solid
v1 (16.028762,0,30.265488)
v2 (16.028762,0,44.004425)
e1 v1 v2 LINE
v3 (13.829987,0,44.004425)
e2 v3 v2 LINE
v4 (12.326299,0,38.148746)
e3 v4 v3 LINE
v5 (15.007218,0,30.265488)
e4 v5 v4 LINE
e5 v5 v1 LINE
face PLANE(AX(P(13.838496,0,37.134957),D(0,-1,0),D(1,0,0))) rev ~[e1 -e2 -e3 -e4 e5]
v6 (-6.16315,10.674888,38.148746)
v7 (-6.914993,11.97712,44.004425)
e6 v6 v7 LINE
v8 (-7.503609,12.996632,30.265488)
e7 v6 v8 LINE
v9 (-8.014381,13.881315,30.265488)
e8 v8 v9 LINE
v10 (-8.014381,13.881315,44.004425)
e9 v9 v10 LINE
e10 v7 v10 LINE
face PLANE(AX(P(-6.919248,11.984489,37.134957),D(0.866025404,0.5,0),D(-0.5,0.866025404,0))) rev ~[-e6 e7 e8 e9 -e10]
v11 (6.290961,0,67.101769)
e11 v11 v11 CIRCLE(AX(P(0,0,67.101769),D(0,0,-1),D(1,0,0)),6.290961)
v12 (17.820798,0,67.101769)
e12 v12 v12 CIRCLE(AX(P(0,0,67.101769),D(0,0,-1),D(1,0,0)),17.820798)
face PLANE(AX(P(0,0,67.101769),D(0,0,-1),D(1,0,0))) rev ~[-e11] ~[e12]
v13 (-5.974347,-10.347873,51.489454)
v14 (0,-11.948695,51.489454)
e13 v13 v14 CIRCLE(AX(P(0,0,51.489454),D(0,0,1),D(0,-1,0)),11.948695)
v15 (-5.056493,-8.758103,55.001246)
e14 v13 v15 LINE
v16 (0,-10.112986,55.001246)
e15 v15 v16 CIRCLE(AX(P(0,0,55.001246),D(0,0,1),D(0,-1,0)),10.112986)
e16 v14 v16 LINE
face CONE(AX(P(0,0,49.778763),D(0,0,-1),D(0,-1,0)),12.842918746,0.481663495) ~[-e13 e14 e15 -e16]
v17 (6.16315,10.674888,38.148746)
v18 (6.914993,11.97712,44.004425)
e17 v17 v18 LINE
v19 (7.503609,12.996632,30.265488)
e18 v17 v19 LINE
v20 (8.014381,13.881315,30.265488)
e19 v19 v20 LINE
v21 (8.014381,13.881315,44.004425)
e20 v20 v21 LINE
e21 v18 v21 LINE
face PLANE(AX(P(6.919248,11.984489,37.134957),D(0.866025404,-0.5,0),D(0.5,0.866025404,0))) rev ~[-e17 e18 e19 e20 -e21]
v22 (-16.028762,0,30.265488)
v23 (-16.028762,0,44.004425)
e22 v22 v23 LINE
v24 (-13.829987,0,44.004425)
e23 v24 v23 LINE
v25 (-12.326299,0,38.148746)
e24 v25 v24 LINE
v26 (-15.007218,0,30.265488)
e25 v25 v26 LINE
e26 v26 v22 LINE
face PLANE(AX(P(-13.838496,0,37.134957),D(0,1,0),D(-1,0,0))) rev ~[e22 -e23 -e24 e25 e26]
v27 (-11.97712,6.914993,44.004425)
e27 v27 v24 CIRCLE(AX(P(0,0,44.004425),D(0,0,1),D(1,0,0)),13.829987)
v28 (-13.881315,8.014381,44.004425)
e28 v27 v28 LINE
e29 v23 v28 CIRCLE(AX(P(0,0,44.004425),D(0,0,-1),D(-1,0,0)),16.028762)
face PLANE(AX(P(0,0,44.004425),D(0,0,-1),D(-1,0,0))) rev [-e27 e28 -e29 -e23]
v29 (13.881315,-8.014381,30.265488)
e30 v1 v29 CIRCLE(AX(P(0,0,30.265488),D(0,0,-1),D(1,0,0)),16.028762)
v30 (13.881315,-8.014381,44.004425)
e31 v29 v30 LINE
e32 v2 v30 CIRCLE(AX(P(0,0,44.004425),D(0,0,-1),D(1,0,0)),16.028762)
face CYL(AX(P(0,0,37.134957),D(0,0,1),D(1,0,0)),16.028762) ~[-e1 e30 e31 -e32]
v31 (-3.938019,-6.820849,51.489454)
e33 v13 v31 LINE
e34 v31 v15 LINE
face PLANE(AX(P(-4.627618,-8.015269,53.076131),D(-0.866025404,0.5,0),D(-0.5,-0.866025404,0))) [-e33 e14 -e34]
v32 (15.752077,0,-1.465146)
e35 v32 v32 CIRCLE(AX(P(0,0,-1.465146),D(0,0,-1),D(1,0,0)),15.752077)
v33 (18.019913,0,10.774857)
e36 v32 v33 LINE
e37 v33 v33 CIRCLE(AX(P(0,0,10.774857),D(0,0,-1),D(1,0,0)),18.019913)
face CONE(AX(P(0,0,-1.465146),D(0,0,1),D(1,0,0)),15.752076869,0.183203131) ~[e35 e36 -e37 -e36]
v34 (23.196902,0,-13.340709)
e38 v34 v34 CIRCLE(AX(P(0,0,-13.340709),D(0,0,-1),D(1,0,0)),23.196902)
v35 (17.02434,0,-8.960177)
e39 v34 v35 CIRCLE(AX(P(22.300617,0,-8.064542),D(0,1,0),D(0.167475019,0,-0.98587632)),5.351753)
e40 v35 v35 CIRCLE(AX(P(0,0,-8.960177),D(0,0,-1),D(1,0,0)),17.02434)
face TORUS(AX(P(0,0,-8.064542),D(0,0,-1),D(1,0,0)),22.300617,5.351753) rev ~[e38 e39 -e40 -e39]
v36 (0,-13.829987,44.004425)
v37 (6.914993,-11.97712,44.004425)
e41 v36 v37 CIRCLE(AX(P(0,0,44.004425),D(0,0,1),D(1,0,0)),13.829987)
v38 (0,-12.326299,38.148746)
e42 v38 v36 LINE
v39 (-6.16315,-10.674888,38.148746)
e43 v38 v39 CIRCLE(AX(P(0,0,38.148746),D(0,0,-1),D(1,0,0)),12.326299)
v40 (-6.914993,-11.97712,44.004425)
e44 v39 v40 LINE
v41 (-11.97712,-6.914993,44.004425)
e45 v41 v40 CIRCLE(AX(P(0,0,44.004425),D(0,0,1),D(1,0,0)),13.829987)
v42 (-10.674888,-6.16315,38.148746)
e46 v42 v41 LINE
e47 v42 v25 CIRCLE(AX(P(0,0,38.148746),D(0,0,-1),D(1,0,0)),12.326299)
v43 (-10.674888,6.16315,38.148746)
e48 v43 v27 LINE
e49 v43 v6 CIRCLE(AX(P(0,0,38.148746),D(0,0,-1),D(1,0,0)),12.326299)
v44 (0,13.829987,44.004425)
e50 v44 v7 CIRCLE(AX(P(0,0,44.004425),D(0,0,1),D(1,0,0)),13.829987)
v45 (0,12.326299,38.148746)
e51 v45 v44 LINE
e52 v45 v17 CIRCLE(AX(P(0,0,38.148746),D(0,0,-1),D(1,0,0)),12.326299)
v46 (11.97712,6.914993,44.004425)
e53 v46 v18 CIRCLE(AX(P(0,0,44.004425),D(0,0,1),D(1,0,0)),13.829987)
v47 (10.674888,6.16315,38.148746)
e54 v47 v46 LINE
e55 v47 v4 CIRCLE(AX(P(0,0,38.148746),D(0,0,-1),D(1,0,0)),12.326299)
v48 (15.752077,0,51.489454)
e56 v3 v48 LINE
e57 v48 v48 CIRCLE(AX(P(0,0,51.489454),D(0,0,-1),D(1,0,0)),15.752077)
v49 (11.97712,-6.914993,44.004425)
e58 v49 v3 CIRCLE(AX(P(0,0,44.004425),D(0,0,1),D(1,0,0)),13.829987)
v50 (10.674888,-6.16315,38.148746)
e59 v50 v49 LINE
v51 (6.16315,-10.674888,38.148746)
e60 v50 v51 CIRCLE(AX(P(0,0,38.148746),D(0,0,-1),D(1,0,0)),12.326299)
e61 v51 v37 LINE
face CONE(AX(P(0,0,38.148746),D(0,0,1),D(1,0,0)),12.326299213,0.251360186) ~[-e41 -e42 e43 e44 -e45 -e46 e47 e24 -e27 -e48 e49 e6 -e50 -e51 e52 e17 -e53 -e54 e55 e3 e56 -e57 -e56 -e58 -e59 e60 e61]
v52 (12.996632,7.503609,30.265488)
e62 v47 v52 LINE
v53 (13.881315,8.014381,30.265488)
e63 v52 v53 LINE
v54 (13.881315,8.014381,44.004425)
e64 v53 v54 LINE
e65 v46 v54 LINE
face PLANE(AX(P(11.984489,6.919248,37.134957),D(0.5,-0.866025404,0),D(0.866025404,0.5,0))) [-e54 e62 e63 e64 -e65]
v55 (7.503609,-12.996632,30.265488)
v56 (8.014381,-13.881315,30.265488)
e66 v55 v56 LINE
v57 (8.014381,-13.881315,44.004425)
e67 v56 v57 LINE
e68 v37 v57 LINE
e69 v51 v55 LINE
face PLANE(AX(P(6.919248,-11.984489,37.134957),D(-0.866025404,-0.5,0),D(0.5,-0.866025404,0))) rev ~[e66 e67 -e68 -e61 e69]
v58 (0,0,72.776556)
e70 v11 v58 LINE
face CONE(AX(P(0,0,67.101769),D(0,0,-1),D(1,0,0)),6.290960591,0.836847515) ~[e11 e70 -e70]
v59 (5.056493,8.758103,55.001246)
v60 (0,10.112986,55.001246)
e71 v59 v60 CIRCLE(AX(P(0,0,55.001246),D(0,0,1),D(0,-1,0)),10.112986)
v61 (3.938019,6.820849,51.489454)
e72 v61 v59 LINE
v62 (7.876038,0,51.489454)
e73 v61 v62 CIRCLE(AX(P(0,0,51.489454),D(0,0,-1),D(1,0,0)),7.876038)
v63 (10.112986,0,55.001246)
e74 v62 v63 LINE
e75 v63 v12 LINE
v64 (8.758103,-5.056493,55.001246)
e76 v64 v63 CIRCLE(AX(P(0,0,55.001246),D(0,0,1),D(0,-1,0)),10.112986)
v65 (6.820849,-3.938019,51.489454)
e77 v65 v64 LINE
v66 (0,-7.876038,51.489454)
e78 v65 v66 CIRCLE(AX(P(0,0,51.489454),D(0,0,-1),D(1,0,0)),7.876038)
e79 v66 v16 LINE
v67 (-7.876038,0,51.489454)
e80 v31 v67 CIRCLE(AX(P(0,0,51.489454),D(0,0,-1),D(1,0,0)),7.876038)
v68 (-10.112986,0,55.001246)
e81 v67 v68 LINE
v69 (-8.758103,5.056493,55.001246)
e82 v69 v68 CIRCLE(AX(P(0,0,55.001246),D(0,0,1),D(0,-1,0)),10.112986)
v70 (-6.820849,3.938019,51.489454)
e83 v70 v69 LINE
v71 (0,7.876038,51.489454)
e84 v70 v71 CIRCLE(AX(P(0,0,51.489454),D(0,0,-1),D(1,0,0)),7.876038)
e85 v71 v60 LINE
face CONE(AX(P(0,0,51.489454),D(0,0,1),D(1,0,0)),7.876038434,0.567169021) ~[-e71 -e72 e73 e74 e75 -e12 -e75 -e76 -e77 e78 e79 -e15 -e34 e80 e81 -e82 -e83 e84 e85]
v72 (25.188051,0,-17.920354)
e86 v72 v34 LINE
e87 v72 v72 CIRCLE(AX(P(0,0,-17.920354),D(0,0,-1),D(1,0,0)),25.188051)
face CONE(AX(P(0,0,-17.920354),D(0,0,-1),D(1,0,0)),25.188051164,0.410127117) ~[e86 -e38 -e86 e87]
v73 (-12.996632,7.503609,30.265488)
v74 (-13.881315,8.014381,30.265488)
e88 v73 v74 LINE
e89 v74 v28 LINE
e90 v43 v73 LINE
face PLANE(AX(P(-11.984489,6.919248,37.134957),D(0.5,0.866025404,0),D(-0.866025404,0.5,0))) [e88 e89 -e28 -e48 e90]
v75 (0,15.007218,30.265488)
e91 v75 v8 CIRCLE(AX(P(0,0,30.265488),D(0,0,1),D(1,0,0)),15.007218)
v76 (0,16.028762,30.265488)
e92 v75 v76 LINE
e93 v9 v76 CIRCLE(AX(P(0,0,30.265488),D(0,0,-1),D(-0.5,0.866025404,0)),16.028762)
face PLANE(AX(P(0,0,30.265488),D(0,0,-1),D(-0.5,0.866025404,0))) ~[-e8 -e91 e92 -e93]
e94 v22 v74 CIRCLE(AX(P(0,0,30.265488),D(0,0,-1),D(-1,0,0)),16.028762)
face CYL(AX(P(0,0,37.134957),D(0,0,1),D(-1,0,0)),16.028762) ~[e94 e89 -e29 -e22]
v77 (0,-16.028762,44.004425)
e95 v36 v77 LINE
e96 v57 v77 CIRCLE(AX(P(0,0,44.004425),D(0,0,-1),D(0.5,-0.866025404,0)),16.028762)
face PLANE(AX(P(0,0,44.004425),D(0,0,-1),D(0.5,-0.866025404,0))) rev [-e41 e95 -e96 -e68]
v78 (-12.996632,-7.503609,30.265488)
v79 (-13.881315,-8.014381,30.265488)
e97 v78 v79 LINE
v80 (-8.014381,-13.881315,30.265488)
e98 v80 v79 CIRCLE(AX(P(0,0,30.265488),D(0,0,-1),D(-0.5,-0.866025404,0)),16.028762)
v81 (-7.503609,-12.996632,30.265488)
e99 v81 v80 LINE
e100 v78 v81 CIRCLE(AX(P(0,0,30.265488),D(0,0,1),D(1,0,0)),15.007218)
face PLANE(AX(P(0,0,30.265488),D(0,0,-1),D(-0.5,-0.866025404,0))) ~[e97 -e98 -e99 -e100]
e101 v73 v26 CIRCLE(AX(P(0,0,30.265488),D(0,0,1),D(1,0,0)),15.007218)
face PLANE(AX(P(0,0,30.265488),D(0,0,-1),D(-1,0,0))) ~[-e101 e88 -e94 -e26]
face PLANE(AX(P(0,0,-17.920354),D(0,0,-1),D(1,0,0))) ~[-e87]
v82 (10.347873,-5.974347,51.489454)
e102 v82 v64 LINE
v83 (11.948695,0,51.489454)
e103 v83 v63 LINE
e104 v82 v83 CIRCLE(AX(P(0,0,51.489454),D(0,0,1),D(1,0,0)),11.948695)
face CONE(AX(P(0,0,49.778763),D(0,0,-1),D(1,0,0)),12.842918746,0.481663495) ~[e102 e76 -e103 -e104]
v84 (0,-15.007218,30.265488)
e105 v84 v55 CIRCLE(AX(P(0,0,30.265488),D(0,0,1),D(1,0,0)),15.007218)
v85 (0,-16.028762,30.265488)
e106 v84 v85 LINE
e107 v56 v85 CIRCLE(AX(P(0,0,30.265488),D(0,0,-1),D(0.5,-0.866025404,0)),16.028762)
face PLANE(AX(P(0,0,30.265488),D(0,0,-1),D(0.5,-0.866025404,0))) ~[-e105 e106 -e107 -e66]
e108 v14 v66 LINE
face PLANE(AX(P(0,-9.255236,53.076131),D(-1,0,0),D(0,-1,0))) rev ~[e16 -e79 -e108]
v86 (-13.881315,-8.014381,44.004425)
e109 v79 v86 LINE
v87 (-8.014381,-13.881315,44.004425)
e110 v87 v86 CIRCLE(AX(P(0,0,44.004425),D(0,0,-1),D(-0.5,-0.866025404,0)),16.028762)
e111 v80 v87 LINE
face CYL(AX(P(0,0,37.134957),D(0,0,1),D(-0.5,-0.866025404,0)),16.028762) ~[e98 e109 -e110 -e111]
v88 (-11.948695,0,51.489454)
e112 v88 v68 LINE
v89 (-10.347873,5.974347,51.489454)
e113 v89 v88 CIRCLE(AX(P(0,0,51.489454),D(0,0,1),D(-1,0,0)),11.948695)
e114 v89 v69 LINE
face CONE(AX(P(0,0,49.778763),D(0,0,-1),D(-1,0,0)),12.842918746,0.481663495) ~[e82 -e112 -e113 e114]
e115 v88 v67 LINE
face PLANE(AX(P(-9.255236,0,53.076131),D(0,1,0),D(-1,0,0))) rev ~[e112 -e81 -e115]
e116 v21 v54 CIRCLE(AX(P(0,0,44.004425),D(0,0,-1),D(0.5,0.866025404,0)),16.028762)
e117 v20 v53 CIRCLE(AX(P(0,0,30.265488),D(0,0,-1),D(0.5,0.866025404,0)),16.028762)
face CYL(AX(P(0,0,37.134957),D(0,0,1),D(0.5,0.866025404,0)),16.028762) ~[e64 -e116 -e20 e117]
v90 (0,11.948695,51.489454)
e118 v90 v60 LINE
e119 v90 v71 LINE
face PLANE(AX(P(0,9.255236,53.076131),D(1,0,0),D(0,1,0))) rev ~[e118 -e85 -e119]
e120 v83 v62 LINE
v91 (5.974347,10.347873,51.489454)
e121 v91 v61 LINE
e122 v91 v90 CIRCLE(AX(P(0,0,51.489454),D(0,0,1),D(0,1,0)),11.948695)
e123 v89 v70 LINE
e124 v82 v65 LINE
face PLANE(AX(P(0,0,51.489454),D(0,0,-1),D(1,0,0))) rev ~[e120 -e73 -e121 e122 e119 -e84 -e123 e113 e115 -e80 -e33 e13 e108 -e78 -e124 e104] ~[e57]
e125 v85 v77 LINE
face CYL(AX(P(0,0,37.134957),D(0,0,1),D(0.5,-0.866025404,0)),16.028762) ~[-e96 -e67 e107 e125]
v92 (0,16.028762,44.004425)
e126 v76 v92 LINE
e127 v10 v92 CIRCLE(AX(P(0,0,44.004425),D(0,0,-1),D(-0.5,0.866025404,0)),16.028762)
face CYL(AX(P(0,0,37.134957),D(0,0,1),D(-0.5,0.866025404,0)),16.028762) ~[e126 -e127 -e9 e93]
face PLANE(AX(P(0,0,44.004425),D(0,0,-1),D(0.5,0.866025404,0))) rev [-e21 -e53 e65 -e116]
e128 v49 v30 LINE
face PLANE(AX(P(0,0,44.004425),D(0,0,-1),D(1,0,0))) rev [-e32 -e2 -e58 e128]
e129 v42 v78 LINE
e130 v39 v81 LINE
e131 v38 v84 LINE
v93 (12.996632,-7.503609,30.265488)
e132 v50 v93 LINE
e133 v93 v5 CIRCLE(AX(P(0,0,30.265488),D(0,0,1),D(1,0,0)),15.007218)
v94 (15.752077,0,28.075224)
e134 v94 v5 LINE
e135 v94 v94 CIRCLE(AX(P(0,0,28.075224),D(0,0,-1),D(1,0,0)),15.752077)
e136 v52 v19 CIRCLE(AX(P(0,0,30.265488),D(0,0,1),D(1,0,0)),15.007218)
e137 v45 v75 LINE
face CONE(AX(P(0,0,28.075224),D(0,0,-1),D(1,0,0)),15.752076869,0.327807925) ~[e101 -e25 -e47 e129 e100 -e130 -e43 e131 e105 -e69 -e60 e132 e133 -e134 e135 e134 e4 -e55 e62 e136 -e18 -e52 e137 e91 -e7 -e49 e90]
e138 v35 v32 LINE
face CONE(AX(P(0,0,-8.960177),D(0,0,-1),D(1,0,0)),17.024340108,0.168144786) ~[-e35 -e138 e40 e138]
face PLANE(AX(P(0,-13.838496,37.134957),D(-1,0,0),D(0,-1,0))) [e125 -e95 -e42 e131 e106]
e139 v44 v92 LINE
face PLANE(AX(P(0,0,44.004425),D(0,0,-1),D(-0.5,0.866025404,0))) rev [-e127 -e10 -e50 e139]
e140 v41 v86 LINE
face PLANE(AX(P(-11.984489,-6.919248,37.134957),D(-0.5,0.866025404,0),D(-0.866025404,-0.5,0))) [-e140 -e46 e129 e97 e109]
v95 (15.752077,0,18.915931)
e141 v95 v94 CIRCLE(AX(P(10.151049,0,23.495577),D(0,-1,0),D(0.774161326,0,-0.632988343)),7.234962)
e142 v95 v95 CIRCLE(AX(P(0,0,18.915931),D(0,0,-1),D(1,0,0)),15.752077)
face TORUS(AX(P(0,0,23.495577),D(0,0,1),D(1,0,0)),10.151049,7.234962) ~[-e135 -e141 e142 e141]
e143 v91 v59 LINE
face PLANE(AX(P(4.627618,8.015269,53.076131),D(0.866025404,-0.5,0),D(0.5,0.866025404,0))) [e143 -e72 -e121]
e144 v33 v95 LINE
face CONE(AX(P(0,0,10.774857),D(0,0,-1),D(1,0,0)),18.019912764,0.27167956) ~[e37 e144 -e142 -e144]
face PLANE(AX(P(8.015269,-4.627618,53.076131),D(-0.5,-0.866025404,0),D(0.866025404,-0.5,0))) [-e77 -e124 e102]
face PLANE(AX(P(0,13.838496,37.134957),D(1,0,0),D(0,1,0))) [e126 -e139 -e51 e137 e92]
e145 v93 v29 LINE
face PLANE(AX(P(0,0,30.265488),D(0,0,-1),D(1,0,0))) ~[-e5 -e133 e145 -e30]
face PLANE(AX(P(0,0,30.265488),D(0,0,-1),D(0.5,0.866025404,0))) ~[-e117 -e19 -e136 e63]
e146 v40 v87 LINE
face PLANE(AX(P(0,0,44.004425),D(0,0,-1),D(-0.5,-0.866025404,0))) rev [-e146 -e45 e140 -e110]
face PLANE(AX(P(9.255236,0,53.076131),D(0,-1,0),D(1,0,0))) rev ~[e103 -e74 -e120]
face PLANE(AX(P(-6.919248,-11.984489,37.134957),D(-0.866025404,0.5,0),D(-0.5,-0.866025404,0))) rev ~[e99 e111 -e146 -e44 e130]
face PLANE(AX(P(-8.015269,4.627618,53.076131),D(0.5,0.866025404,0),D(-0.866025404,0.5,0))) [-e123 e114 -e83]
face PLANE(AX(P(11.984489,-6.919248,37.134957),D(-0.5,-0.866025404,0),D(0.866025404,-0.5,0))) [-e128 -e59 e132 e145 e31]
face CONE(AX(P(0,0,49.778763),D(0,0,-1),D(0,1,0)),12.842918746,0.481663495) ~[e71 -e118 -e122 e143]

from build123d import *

# Parameters (mm, degrees)
F2_W            = 4.3805325404
F2_H            = 13.738937676
F3_ANGLE        = 30
F3_COPIES_COUNT = 6
F5_ANGLE        = 30
F5_COPIES_COUNT = 4


# Not quite as in the source:
# - a pattern or mirror of a feature is missing from the dataset's text; its kind, count and spacing are read off the source's solid


with BuildPart() as f1:
    # F0 (on Front) → F1 (revolve)
    with BuildSketch(Plane.XZ):
        Polygon((0, 72.776556015), (0, 67.1017691493), (6.2909605913, 67.1017691493), align=None)
        Polygon((0, 67.1017691493), (0, 51.4894537628), (7.8760384344, 51.4894537628), (17.8207978606, 67.1017691493), (6.2909605913, 67.1017691493), align=None)
        with BuildLine():
            Line((0, 51.4894537628), (0, -17.9203543812))
            Line((0, -17.9203543812), (25.1880511642, -17.9203543812))
            Line((25.1880511642, -17.9203543812), (23.1969021261, -13.3407087997))
            ThreePointArc((23.1969021261, -13.3407087997), (19.2033042996, -12.428933787), (17.024340108, -8.9601771906))
            Line((17.024340108, -8.9601771906), (15.7520768689, -1.4651455679))
            Line((15.7520768689, -1.4651455679), (18.0199127644, 10.7748573646))
            Line((18.0199127644, 10.7748573646), (15.7520768689, 18.9159307629))
            ThreePointArc((15.7520768689, 18.9159307629), (17.3860110627, 23.4955772758), (15.7520768689, 28.0752237886))
            Line((15.7520768689, 28.0752237886), (12.3262992129, 38.1487458944))
            Line((12.3262992129, 38.1487458944), (15.7520768689, 51.4894537628))
            Line((15.7520768689, 51.4894537628), (7.8760384344, 51.4894537628))
            Line((7.8760384344, 51.4894537628), (0, 51.4894537628))
        make_face()
    revolve(axis=Axis((0, 0, 27.4281008169), (0, 0, -1)))

    # F2 (on Front) → F3 (revolve)
    with BuildSketch(Plane.XZ):
        with Locations((13.8384955935, 37.1349565685)):
            Rectangle(F2_W, F2_H)
    f3 = revolve(axis=Axis((0, 0, 27.4281008169), (0, 0, -1)), revolution_arc=F3_ANGLE)

    # F3_copies: F3 ×6 about axis
    f3_copies_axis = Axis((0, 0, 0), (0, 0, 1))
    for i in range(1, F3_COPIES_COUNT):
        add(f3.rotate(f3_copies_axis, i * 360 / F3_COPIES_COUNT))

    # F4 (on Front) → F5 (revolve)
    with BuildSketch(Plane.XZ):
        Polygon((12.8429187462, 49.7787632048), (8.263274096, 58.5398264229), (6.6703548655, 49.7787632048), align=None)
    f5 = revolve(axis=Axis((0, 0, 27.4281008169), (0, 0, -1)), revolution_arc=F5_ANGLE)

    # F5_copies: F5 ×4 about axis
    f5_copies_axis = Axis((0, 0, 0), (0, 0, 1))
    for i in range(1, F5_COPIES_COUNT):
        add(f5.rotate(f5_copies_axis, i * 360 / F5_COPIES_COUNT))


solid = f1.part
